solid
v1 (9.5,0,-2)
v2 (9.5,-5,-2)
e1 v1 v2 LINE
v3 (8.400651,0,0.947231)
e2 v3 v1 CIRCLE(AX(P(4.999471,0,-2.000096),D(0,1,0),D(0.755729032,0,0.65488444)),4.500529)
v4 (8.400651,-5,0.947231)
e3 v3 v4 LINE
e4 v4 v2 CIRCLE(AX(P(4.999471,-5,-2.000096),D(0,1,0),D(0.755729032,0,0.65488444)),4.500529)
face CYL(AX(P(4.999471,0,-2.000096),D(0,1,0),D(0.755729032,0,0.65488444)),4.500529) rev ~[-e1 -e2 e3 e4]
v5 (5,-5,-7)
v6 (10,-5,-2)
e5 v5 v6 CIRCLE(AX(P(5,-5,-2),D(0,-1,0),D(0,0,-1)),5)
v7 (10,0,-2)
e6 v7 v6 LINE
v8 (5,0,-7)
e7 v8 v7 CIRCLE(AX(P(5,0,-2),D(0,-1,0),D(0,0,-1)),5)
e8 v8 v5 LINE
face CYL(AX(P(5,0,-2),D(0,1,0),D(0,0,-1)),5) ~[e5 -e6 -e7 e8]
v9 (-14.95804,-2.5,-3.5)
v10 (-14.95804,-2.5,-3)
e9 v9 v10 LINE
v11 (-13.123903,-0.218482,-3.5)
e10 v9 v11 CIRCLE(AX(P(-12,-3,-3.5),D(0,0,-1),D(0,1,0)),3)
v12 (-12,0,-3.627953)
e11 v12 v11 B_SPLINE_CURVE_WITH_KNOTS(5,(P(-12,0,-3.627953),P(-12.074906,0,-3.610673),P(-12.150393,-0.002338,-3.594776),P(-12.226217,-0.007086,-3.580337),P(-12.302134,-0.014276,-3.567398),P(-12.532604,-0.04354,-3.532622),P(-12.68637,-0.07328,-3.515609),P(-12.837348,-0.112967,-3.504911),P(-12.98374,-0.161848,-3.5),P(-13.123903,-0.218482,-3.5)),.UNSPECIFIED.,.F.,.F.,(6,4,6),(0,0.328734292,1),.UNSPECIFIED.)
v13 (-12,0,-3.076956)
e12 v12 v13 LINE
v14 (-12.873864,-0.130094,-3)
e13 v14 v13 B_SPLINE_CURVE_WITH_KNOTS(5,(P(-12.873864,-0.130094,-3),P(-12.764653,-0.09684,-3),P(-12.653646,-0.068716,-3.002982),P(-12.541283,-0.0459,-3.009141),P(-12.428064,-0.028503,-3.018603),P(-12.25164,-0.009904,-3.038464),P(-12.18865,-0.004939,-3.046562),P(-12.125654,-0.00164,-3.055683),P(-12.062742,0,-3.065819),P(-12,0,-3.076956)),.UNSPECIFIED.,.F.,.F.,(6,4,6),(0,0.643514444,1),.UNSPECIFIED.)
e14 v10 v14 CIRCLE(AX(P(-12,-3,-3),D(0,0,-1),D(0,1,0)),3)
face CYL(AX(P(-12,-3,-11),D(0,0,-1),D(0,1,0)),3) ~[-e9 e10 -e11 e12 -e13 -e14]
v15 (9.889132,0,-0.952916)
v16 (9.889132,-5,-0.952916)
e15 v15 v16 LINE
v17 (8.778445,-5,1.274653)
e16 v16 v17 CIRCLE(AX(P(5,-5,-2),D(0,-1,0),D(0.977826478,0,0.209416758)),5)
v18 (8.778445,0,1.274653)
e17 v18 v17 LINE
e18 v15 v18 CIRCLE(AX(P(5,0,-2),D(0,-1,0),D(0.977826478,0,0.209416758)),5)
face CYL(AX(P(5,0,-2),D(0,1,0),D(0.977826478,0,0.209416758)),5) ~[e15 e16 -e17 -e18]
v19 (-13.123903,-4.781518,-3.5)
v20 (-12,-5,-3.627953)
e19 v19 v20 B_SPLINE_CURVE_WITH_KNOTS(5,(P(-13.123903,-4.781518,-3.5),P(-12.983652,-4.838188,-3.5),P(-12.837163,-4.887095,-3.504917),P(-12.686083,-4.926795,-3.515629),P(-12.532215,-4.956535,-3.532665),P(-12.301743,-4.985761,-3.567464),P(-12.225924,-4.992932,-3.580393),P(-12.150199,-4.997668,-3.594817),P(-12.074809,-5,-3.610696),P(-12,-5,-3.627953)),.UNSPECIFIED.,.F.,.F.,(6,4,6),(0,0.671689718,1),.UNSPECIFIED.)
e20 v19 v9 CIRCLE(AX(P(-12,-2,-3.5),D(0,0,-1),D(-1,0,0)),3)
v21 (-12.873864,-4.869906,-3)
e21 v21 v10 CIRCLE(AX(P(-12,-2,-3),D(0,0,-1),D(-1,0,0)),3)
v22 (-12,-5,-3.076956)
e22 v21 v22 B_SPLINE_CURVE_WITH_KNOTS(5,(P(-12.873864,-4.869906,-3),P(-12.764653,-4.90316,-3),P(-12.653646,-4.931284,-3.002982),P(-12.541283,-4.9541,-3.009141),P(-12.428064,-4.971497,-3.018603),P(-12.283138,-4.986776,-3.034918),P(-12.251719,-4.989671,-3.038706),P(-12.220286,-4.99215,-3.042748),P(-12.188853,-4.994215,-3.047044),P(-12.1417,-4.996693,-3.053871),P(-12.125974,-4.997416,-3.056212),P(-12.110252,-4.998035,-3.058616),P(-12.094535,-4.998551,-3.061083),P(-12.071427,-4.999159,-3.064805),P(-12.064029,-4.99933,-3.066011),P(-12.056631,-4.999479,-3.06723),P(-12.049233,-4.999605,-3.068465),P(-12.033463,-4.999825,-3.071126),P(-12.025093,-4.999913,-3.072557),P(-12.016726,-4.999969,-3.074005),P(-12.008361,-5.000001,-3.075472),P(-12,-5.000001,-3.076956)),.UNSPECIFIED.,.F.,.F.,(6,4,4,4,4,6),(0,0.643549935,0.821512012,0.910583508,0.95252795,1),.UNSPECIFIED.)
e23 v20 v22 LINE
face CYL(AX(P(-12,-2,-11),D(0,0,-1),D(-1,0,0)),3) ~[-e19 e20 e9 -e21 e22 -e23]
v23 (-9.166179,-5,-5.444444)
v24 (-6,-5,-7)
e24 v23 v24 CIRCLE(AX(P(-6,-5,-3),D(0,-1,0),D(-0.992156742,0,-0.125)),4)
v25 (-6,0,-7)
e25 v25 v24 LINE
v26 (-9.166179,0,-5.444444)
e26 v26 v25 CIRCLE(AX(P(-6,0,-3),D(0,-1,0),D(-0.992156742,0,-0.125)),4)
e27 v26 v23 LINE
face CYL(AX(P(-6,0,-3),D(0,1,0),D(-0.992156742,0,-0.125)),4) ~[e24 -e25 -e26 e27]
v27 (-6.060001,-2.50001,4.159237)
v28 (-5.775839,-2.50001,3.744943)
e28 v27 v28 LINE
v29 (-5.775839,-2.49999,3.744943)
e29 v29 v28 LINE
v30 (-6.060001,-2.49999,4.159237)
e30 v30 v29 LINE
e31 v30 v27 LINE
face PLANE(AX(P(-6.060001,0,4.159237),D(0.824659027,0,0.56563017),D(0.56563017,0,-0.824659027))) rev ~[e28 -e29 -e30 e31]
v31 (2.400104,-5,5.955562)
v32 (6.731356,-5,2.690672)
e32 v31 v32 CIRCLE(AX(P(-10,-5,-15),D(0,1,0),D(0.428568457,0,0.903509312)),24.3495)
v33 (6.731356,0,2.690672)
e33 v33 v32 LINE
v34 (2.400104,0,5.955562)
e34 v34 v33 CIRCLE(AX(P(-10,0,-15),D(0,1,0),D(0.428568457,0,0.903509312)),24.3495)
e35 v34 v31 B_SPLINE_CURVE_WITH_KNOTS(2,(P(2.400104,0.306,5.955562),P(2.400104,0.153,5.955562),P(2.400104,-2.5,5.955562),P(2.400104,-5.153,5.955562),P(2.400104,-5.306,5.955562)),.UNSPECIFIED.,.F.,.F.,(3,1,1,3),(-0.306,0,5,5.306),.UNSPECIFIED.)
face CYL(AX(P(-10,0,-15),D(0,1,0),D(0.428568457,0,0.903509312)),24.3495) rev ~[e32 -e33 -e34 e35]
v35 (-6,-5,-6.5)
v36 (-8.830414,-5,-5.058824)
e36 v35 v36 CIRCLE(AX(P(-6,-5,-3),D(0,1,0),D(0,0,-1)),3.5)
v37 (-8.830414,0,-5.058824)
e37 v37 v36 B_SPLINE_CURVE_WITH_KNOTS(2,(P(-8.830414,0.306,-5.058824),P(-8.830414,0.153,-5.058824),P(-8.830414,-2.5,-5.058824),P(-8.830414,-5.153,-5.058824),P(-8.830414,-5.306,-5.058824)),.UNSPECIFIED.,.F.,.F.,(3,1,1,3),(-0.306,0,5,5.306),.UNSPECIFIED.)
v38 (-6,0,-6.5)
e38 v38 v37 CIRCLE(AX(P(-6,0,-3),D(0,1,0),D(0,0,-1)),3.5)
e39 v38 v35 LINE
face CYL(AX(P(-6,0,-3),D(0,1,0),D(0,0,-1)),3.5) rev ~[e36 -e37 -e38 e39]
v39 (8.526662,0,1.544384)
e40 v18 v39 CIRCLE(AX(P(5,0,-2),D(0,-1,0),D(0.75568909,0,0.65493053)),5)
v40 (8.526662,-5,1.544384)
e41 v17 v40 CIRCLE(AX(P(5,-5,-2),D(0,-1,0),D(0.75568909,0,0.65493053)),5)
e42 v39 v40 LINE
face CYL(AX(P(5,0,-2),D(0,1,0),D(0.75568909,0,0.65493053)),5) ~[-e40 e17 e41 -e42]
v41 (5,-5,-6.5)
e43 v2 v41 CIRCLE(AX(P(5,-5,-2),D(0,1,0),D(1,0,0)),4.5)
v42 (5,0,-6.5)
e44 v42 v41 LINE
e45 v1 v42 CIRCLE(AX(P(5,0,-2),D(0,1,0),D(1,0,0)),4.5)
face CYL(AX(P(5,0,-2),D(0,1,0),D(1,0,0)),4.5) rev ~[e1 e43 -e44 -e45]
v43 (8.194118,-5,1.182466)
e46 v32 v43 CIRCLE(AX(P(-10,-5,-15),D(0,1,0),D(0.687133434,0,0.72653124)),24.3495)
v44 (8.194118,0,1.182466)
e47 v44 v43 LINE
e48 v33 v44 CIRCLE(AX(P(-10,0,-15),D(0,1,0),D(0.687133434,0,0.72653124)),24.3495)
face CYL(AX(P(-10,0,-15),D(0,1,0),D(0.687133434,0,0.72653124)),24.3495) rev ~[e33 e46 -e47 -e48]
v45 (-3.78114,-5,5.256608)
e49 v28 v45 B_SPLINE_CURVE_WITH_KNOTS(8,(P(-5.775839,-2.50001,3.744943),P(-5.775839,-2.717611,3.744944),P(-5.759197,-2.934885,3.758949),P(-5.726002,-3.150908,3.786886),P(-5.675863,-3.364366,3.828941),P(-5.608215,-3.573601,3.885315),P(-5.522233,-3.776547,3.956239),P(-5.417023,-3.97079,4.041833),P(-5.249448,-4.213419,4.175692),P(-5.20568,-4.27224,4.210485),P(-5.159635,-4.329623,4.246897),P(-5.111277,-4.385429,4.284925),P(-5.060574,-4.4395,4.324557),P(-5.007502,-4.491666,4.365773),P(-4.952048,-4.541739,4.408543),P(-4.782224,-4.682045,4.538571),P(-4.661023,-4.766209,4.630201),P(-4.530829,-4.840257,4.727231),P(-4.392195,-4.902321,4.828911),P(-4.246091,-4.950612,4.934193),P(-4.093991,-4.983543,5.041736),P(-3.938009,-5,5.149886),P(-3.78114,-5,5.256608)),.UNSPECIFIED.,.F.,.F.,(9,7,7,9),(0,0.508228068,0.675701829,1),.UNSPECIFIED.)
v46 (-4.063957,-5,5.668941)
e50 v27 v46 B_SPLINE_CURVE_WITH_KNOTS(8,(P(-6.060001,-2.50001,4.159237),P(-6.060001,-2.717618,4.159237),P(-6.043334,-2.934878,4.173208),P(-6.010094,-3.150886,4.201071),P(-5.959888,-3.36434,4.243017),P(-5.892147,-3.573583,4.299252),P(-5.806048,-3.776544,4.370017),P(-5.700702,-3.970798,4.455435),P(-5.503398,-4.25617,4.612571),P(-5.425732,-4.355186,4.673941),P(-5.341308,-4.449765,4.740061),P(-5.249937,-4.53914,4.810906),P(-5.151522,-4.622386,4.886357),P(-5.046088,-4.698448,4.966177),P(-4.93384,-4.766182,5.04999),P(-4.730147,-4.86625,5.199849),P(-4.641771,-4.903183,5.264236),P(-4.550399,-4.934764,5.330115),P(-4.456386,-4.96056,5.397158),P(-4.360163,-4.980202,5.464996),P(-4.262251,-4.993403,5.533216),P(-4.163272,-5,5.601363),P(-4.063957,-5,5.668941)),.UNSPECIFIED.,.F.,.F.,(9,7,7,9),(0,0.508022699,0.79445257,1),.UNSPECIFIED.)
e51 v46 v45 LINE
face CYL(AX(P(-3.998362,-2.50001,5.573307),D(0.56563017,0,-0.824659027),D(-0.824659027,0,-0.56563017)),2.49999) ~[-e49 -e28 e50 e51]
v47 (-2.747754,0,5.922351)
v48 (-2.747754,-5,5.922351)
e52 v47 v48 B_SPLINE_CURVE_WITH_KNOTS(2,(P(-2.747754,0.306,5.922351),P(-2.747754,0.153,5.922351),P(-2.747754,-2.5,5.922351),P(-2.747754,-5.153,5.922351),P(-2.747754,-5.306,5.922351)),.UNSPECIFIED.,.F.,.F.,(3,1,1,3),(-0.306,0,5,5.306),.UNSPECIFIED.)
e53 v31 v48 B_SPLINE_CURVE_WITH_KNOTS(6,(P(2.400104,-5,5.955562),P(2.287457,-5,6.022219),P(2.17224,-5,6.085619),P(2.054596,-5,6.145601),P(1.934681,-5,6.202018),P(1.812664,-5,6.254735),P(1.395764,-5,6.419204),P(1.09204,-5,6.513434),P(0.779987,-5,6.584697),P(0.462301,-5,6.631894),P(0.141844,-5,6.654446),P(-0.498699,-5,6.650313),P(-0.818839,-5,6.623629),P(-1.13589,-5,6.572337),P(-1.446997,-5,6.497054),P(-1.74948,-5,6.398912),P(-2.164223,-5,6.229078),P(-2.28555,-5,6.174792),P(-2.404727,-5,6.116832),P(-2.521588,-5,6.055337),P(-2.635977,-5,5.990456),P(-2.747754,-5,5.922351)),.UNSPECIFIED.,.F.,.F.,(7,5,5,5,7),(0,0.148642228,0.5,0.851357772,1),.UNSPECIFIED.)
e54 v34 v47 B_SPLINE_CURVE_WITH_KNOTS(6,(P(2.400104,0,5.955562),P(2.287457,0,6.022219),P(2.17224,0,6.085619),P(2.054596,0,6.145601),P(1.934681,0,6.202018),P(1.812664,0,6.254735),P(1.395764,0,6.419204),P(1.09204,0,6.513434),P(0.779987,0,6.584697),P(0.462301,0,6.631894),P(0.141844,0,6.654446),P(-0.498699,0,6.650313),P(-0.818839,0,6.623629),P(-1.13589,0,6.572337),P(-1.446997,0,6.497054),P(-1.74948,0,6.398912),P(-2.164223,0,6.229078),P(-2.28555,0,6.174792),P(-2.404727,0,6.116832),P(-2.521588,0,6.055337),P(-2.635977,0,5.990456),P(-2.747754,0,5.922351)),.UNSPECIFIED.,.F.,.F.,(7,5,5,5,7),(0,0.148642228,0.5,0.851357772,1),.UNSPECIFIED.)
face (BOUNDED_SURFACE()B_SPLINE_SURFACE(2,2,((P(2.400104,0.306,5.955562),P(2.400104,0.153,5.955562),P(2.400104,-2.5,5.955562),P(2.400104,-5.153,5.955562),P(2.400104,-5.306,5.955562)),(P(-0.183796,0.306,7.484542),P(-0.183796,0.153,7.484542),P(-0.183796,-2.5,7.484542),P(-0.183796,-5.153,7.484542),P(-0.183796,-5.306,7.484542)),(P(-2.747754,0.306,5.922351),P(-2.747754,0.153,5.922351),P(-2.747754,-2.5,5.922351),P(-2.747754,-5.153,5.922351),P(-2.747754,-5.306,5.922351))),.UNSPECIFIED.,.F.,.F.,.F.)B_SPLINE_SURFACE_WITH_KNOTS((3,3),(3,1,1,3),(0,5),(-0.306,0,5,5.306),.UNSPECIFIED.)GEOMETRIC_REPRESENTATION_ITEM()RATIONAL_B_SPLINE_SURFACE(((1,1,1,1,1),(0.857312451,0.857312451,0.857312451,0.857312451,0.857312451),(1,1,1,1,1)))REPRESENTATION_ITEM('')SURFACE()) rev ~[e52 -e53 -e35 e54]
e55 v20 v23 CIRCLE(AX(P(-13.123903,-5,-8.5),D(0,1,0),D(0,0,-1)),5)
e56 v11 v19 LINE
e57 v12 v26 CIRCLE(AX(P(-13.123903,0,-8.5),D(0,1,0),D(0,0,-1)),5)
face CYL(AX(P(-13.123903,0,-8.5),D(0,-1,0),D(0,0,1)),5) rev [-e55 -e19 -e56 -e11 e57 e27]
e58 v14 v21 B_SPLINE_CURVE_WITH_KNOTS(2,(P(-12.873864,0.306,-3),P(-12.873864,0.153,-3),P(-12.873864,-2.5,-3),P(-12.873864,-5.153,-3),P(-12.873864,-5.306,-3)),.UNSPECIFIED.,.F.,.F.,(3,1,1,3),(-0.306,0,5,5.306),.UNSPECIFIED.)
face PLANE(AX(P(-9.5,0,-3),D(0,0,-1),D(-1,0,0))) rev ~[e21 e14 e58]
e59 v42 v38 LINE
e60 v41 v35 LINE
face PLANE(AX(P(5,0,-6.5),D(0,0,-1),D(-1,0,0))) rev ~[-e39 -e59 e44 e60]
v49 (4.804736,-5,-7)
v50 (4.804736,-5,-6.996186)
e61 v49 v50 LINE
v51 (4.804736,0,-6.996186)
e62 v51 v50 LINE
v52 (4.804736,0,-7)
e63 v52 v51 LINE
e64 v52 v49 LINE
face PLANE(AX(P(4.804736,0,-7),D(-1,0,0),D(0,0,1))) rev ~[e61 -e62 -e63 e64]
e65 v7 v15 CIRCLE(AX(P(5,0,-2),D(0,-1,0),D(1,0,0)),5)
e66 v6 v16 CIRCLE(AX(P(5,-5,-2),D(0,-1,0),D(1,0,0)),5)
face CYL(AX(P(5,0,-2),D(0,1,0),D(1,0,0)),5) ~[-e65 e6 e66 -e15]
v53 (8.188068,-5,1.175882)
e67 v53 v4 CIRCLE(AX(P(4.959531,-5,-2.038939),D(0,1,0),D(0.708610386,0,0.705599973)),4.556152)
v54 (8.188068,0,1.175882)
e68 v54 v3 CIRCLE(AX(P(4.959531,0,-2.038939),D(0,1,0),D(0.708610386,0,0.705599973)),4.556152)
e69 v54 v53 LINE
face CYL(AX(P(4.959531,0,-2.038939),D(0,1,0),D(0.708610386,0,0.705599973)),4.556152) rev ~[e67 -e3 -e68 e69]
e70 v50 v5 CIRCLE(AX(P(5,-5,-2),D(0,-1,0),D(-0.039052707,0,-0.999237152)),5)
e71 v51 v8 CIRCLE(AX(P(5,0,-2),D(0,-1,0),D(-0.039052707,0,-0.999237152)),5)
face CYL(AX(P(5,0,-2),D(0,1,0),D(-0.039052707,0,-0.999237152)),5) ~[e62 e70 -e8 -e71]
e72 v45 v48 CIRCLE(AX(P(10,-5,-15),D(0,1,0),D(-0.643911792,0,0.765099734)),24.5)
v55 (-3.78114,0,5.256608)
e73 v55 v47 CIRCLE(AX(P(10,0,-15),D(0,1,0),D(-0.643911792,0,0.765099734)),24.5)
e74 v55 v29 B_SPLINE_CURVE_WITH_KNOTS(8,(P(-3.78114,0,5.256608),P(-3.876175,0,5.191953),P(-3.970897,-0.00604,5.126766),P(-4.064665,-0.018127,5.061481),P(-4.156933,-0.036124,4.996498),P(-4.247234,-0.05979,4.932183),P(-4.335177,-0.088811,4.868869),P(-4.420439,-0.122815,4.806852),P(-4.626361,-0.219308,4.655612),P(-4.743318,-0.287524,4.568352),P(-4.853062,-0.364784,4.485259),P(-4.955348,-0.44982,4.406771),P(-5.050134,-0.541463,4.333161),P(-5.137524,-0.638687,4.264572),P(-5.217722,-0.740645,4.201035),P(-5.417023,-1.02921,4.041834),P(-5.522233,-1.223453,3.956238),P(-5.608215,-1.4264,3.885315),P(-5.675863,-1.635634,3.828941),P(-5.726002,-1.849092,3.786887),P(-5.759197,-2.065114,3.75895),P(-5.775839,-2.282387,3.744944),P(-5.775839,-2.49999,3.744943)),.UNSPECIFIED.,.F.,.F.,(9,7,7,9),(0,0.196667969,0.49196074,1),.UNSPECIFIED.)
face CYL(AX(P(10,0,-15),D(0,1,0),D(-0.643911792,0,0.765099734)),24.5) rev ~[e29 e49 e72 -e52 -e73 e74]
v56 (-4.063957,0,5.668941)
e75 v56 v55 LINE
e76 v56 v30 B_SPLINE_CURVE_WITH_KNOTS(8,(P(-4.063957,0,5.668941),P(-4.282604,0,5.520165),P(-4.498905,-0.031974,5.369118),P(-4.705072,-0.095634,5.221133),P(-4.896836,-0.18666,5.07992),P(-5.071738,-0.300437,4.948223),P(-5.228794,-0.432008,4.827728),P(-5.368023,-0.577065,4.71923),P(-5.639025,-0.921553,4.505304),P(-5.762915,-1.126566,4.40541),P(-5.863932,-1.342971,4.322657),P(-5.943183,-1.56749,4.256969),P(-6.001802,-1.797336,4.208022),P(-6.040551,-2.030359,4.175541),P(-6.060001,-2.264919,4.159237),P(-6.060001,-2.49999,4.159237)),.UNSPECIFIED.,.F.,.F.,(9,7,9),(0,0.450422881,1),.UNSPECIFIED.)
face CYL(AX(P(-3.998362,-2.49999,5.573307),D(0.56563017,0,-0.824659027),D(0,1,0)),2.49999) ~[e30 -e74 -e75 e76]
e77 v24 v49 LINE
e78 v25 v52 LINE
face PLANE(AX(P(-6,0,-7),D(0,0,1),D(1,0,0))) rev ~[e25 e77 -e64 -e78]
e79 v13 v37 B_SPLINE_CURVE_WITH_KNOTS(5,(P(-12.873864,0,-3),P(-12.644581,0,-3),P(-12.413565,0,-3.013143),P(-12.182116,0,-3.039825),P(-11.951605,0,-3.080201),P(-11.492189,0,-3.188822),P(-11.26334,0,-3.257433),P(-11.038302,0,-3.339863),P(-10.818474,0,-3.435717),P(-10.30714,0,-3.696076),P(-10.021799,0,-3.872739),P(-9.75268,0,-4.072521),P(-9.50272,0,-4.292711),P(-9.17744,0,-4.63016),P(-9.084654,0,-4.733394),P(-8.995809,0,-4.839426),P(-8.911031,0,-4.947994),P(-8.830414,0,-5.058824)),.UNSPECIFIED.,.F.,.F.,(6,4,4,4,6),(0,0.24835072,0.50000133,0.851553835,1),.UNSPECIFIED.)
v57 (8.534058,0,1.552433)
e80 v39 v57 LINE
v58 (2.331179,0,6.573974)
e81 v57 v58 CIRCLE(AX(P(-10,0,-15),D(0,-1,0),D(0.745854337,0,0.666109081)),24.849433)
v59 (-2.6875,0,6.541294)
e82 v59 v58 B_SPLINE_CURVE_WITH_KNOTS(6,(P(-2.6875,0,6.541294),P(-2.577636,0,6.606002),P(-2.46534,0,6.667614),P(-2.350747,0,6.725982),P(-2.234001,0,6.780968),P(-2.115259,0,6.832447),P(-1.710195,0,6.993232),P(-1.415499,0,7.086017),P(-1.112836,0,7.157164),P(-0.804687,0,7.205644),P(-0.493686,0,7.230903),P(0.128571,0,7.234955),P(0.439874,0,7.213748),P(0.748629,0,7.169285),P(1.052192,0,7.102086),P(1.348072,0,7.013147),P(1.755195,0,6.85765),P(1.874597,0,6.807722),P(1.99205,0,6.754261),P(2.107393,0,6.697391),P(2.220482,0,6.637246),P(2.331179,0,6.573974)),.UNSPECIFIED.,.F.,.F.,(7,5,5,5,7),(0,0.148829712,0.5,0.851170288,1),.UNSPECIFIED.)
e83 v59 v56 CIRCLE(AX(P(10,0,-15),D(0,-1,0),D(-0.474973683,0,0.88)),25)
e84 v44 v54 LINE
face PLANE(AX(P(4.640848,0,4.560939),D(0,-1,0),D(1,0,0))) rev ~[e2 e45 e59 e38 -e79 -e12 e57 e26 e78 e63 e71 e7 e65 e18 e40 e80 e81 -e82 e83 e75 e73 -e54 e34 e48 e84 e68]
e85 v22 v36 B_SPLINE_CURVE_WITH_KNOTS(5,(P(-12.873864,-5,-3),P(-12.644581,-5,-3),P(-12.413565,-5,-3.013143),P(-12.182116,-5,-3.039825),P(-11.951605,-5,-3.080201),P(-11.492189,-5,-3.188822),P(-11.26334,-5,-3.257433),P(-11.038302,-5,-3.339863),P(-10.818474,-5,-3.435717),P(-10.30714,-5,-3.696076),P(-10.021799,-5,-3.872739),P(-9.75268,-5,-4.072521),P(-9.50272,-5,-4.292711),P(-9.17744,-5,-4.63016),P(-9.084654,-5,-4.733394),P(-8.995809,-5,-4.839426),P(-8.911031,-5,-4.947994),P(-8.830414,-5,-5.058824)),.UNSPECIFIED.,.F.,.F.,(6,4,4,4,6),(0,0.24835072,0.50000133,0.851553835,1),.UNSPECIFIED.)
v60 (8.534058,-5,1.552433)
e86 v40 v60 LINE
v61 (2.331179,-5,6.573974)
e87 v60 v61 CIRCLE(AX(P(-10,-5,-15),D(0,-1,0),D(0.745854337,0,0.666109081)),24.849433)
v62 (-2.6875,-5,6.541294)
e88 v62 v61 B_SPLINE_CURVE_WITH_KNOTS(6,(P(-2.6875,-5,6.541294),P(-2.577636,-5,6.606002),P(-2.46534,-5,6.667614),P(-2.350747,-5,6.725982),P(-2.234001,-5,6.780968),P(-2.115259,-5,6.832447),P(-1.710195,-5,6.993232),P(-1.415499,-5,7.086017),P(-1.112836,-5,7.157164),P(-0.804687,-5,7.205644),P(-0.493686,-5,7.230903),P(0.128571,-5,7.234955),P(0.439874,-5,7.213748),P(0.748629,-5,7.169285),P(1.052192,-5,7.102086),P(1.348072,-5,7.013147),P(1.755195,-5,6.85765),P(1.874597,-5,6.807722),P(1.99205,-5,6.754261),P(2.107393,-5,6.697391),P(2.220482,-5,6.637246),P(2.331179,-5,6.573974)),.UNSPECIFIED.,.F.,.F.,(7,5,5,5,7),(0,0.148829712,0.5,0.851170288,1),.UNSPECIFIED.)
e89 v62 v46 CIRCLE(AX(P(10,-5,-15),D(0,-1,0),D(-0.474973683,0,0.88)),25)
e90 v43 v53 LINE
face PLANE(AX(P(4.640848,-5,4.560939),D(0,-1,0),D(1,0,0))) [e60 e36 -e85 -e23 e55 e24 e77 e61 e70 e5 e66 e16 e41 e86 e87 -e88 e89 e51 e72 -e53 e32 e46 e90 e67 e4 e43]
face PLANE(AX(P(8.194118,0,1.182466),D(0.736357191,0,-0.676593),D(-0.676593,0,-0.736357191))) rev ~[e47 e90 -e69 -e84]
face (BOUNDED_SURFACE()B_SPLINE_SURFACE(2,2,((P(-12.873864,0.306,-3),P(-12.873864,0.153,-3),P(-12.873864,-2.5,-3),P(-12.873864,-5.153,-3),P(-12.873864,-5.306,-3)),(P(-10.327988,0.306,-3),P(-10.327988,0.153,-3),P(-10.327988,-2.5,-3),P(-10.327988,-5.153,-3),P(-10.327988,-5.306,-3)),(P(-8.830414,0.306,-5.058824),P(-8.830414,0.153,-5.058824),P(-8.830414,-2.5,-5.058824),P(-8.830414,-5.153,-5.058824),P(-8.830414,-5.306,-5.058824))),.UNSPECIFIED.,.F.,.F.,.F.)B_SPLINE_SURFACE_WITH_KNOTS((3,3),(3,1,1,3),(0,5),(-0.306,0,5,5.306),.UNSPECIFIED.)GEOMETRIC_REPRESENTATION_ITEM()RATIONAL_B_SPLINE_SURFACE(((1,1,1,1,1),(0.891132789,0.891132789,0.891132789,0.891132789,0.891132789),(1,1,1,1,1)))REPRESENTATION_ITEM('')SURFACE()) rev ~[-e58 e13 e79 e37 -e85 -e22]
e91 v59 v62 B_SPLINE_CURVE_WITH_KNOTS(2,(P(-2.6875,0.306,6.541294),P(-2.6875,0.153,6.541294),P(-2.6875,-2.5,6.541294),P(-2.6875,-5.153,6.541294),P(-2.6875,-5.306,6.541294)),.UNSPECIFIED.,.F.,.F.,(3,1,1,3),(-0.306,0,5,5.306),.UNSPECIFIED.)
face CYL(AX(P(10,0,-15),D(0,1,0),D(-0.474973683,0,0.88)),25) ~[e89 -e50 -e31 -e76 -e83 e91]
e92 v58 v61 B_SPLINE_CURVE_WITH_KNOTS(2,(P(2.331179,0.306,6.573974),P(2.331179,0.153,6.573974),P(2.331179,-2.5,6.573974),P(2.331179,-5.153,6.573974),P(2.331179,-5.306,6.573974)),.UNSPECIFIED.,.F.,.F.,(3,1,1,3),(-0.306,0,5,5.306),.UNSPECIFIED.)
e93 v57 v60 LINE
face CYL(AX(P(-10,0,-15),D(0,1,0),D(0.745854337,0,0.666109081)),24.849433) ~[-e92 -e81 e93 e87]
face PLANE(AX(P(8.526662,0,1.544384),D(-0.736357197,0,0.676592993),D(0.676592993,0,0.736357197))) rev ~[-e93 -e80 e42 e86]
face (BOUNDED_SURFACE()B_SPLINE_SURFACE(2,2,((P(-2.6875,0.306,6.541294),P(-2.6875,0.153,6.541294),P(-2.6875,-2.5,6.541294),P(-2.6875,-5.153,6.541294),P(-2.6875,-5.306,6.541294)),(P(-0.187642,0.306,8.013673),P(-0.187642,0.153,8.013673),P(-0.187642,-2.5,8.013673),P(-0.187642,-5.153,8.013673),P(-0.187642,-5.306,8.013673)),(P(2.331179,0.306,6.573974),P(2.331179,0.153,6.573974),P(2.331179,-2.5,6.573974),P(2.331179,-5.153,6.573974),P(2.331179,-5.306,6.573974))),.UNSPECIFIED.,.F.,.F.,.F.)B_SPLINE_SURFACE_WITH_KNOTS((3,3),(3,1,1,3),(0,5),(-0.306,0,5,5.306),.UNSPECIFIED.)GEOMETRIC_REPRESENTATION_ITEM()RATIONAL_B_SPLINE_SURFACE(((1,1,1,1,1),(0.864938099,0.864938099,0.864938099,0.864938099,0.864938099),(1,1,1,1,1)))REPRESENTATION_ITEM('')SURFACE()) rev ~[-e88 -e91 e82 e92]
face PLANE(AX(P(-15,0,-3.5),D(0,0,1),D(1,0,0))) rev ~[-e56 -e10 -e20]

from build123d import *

# Parameters (mm, degrees)
F1_DEPTH    = 5
F2_R        = 5
F3_R        = 5
F4_R        = 5
F5_R        = 5
F6_R        = 2.49999
F7_T1_DEPTH = 15.5


# Not quite as in the source:
# - a fillet or chamfer that OpenCascade refuses, or shapes differently, is made with other operations: its cross-section is extruded or revolved along the edge and cut away or added
# - a fillet or chamfer is up to 0.001 mm smaller than in the source, because OpenCascade refuses the exact size
# - ends of sketch curves that miss each other by under 0.0002 mm in the source are joined


with BuildPart() as f1:
    # F0 (on Front) → F1 (new body)
    with BuildSketch(Plane.XZ):
        with BuildLine():
            ThreePointArc((8.5340575526, 1.5524331459), (5.288604189, 4.5896124098), (1.5539747452, 7))
            Line((1.5539747452, 7), (0.4354276506, 7))
            ThreePointArc((0.4354276506, 7), (3.7532215697, 5.0934578086), (6.7313555625, 2.6906724375))
            ThreePointArc((6.7313555625, 2.6906724375), (7.6907583635, 2.2142400773), (8.526661649, 1.544383954))
            Line((8.526661649, 1.544383954), (8.5340575526, 1.5524331459))
        make_face()
        with BuildLine():
            Line((0.4354276506, 7), (1.5539747452, 7))
            ThreePointArc((1.5539747452, 7), (0.9960319704, 7.2841112302), (0.4311083103, 7.5540752821))
            ThreePointArc((0.4311083103, 7.5540752821), (0.1227273169, 7.4207378189), (-0.1837962437, 7.2831841097))
            ThreePointArc((-0.1837962437, 7.2831841097), (0.1268056153, 7.1437566434), (0.4354276506, 7))
        make_face()
        with BuildLine():
            ThreePointArc((-0.1837962437, 7.2831841097), (0.1227273169, 7.4207378189), (0.4311083103, 7.5540752821))
            ThreePointArc((0.4311083103, 7.5540752821), (0.1226739578, 7.6941799666), (-0.1876416897, 7.830066947))
            ThreePointArc((-0.1876416897, 7.830066947), (-0.4960575858, 7.6899267332), (-0.8025462438, 7.5456202987))
            ThreePointArc((-0.8025462438, 7.5456202987), (-0.4922657174, 7.4165371782), (-0.1837962437, 7.2831841097))
        make_face()
        with BuildLine():
            ThreePointArc((9.8891323912, -0.952916211), (9.474622014, 0.231088934), (8.7784454506, 1.2746526497))
            ThreePointArc((8.7784454506, 1.2746526497), (8.6550425686, 1.4118417052), (8.526661649, 1.544383954))
            Line((8.526661649, 1.544383954), (8.1941180403, 1.1824664061))
            ThreePointArc((8.1941180403, 1.1824664061), (8.2977627182, 1.0651806637), (8.4006513445, 0.9472311186))
            ThreePointArc((8.4006513445, 0.9472311186), (9.1684512833, 0.0156127298), (9.8891323912, -0.952916211))
        make_face()
        with BuildLine():
            ThreePointArc((-5.7758389138, 3.7449434933), (-3.3782514437, 5.5249211523), (-0.7819293264, 7))
            Line((-0.7819293264, 7), (-1.874342087, 7))
            ThreePointArc((-1.874342087, 7), (-4.0392081747, 5.6857592036), (-6.0600011216, 4.1592370405))
            Line((-6.0600011216, 4.1592370405), (-5.7758389138, 3.7449434933))
        make_face()
        with BuildLine():
            Line((-1.874342087, 7), (-0.7819293264, 7))
            ThreePointArc((-0.7819293264, 7), (-0.4838189836, 7.143611709), (-0.1837962437, 7.2831841097))
            ThreePointArc((-0.1837962437, 7.2831841097), (-0.4922657174, 7.4165371782), (-0.8025462438, 7.5456202987))
            ThreePointArc((-0.8025462438, 7.5456202987), (-1.341725683, 7.2792562383), (-1.874342087, 7))
        make_face()
        with BuildLine():
            ThreePointArc((8.526661649, 1.544383954), (7.6907583635, 2.2142400773), (6.7313555625, 2.6906724375))
            ThreePointArc((6.7313555625, 2.6906724375), (7.4790116412, 1.9523538866), (8.1941180403, 1.1824664061))
            Line((8.1941180403, 1.1824664061), (8.526661649, 1.544383954))
        make_face()
        with BuildLine():
            ThreePointArc((5, -7), (8.5355339059, -5.5355339059), (10, -2))
            ThreePointArc((10, -2), (9.9722058463, -1.4735315565), (9.8891323912, -0.952916211))
            ThreePointArc((9.8891323912, -0.952916211), (9.1684512833, 0.0156127298), (8.4006513445, 0.9472311186))
            ThreePointArc((8.4006513445, 0.9472311186), (9.2162011355, -0.4272164851), (9.5, -2))
            ThreePointArc((9.5, -2), (8.1819805153, -5.1819805153), (5, -6.5))
            Line((5, -6.5), (5, -7))
        make_face()
        with BuildLine():
            Line((4.8047364689, -6.5), (2.8205505282, -6.5))
            ThreePointArc((2.8205505282, -6.5), (3.7870014268, -6.8506323775), (4.8047364689, -6.9961857605))
            Line((4.8047364689, -6.9961857605), (4.8047364689, -6.5))
        make_face()
        with BuildLine():
            ThreePointArc((4.8047364689, -6.9961857605), (3.7870014268, -6.8506323775), (2.8205505282, -6.5))
            Line((2.8205505282, -6.5), (-4.0635083269, -6.5))
            ThreePointArc((-4.0635083269, -6.5), (-5, -6.8729833462), (-6, -7))
            Line((-6, -7), (4.8047364689, -7))
            Line((4.8047364689, -7), (4.8047364689, -6.9961857605))
        make_face()
        with BuildLine():
            ThreePointArc((8.4006513445, 0.9472311186), (8.2977627182, 1.0651806637), (8.1941180403, 1.1824664061))
            Line((8.1941180403, 1.1824664061), (8.1880677147, 1.1758816487))
            ThreePointArc((8.1880677147, 1.1758816487), (8.2963182158, 1.0633782366), (8.4006513445, 0.9472311186))
        make_face()
        with BuildLine():
            ThreePointArc((4.8047364689, -6.9961857605), (4.9023496096, -6.9990463492), (5, -7))
            Line((5, -7), (5, -6.5))
            Line((5, -6.5), (4.8047364689, -6.5))
            Line((4.8047364689, -6.5), (4.8047364689, -6.9961857605))
        make_face()
        with BuildLine():
            ThreePointArc((-6, -7), (-5, -6.8729833462), (-4.0635083269, -6.5))
            Line((-4.0635083269, -6.5), (-6, -6.5))
            Line((-6, -6.5), (-6, -7))
        make_face()
        with BuildLine():
            Line((-12.1979728804, -3.5), (-11.6333076528, -3.5))
            ThreePointArc((-11.6333076528, -3.5), (-11.4981121732, -3.2492054316), (-11.3600093633, -3))
            Line((-11.3600093633, -3), (-11.9317121995, -3))
            ThreePointArc((-11.9317121995, -3), (-12.0662587747, -3.2492458247), (-12.1979728804, -3.5))
        make_face()
        with BuildLine():
            ThreePointArc((-11.3600093633, -3), (-11.4981121732, -3.2492054316), (-11.6333076528, -3.5))
            Line((-11.6333076528, -3.5), (-10, -3.5))
            Line((-10, -3.5), (-10, -3))
            Line((-10, -3), (-11.3600093633, -3))
        make_face()
        with BuildLine():
            ThreePointArc((-9.9686269666, -3.5), (-9.9921490369, -3.2504916502), (-10, -3))
            Line((-10, -3), (-10, -3.5))
            Line((-10, -3.5), (-9.9686269666, -3.5))
        make_face()
        with BuildLine():
            Line((-9.5, -3), (-10, -3))
            ThreePointArc((-10, -3), (-9.9921490369, -3.2504916502), (-9.9686269666, -3.5))
            Line((-9.9686269666, -3.5), (-9.4641016151, -3.5))
            ThreePointArc((-9.4641016151, -3.5), (-9.491013868, -3.2506435188), (-9.5, -3))
        make_face()
        with BuildLine():
            ThreePointArc((-9.9686269666, -3.5), (-8.6457513111, -6), (-6, -7))
            Line((-6, -7), (-6, -6.5))
            ThreePointArc((-6, -6.5), (-8.2912878475, -5.6457513111), (-9.4641016151, -3.5))
            Line((-9.4641016151, -3.5), (-9.9686269666, -3.5))
        make_face()
        with BuildLine():
            Line((-15, -3.5), (-12.1979728804, -3.5))
            ThreePointArc((-12.1979728804, -3.5), (-12.0662587747, -3.2492458247), (-11.9317121995, -3))
            Line((-11.9317121995, -3), (-15, -3))
            Line((-15, -3), (-15, -3.5))
        make_face()
    extrude(amount=F1_DEPTH)

    # F2
    f2_edges = [f1.edges().sort_by_distance(p)[0] for p in [
        (-9.968627, -2.5, -3.5),
    ]]
    fillet(f2_edges, radius=F2_R)

    # F3
    f3_edges = [f1.edges().sort_by_distance(p)[0] for p in [
        (-9.5, -2.5, -3),
    ]]
    fillet(f3_edges, radius=F3_R)

    # F4
    f4_edges = [f1.edges().sort_by_distance(p)[0] for p in [
        (-0.183796, -2.5, 7.283184),
    ]]
    fillet(f4_edges, radius=F4_R)

    # F5
    f5_edges = [f1.edges().sort_by_distance(p)[0] for p in [
        (-0.187642, -2.5, 7.830067),
    ]]
    fillet(f5_edges, radius=F5_R)

    # F6 (radius 2.5 in the source; OpenCascade refuses exactly that, so slightly less here)
    f6_edges = [f1.edges().sort_by_distance(p)[0] for p in [
        (-5.91792, -5, 3.95209),
        (-5.91792, 0, 3.95209),
    ]]
    fillet(f6_edges, radius=F6_R)

    # F7: fillet of radius 3 on 2 edges, made by hand

    # F7_s2 → F7_t1 (cut)
    with BuildSketch(Plane.XY.offset(-11)):
        with BuildLine():
            ThreePointArc((-15, -2), (-14.1213203436, -4.1213203436), (-12, -5))
            Line((-12, -5), (-15, -5))
            Line((-15, -5), (-15, -2))
        make_face()
        with BuildLine():
            ThreePointArc((-12, 0), (-14.1213203436, -0.8786796564), (-15, -3))
            Line((-15, -3), (-15, 0))
            Line((-15, 0), (-12, 0))
        make_face()
    extrude(amount=F7_T1_DEPTH, mode=Mode.SUBTRACT)


solid = f1.part
